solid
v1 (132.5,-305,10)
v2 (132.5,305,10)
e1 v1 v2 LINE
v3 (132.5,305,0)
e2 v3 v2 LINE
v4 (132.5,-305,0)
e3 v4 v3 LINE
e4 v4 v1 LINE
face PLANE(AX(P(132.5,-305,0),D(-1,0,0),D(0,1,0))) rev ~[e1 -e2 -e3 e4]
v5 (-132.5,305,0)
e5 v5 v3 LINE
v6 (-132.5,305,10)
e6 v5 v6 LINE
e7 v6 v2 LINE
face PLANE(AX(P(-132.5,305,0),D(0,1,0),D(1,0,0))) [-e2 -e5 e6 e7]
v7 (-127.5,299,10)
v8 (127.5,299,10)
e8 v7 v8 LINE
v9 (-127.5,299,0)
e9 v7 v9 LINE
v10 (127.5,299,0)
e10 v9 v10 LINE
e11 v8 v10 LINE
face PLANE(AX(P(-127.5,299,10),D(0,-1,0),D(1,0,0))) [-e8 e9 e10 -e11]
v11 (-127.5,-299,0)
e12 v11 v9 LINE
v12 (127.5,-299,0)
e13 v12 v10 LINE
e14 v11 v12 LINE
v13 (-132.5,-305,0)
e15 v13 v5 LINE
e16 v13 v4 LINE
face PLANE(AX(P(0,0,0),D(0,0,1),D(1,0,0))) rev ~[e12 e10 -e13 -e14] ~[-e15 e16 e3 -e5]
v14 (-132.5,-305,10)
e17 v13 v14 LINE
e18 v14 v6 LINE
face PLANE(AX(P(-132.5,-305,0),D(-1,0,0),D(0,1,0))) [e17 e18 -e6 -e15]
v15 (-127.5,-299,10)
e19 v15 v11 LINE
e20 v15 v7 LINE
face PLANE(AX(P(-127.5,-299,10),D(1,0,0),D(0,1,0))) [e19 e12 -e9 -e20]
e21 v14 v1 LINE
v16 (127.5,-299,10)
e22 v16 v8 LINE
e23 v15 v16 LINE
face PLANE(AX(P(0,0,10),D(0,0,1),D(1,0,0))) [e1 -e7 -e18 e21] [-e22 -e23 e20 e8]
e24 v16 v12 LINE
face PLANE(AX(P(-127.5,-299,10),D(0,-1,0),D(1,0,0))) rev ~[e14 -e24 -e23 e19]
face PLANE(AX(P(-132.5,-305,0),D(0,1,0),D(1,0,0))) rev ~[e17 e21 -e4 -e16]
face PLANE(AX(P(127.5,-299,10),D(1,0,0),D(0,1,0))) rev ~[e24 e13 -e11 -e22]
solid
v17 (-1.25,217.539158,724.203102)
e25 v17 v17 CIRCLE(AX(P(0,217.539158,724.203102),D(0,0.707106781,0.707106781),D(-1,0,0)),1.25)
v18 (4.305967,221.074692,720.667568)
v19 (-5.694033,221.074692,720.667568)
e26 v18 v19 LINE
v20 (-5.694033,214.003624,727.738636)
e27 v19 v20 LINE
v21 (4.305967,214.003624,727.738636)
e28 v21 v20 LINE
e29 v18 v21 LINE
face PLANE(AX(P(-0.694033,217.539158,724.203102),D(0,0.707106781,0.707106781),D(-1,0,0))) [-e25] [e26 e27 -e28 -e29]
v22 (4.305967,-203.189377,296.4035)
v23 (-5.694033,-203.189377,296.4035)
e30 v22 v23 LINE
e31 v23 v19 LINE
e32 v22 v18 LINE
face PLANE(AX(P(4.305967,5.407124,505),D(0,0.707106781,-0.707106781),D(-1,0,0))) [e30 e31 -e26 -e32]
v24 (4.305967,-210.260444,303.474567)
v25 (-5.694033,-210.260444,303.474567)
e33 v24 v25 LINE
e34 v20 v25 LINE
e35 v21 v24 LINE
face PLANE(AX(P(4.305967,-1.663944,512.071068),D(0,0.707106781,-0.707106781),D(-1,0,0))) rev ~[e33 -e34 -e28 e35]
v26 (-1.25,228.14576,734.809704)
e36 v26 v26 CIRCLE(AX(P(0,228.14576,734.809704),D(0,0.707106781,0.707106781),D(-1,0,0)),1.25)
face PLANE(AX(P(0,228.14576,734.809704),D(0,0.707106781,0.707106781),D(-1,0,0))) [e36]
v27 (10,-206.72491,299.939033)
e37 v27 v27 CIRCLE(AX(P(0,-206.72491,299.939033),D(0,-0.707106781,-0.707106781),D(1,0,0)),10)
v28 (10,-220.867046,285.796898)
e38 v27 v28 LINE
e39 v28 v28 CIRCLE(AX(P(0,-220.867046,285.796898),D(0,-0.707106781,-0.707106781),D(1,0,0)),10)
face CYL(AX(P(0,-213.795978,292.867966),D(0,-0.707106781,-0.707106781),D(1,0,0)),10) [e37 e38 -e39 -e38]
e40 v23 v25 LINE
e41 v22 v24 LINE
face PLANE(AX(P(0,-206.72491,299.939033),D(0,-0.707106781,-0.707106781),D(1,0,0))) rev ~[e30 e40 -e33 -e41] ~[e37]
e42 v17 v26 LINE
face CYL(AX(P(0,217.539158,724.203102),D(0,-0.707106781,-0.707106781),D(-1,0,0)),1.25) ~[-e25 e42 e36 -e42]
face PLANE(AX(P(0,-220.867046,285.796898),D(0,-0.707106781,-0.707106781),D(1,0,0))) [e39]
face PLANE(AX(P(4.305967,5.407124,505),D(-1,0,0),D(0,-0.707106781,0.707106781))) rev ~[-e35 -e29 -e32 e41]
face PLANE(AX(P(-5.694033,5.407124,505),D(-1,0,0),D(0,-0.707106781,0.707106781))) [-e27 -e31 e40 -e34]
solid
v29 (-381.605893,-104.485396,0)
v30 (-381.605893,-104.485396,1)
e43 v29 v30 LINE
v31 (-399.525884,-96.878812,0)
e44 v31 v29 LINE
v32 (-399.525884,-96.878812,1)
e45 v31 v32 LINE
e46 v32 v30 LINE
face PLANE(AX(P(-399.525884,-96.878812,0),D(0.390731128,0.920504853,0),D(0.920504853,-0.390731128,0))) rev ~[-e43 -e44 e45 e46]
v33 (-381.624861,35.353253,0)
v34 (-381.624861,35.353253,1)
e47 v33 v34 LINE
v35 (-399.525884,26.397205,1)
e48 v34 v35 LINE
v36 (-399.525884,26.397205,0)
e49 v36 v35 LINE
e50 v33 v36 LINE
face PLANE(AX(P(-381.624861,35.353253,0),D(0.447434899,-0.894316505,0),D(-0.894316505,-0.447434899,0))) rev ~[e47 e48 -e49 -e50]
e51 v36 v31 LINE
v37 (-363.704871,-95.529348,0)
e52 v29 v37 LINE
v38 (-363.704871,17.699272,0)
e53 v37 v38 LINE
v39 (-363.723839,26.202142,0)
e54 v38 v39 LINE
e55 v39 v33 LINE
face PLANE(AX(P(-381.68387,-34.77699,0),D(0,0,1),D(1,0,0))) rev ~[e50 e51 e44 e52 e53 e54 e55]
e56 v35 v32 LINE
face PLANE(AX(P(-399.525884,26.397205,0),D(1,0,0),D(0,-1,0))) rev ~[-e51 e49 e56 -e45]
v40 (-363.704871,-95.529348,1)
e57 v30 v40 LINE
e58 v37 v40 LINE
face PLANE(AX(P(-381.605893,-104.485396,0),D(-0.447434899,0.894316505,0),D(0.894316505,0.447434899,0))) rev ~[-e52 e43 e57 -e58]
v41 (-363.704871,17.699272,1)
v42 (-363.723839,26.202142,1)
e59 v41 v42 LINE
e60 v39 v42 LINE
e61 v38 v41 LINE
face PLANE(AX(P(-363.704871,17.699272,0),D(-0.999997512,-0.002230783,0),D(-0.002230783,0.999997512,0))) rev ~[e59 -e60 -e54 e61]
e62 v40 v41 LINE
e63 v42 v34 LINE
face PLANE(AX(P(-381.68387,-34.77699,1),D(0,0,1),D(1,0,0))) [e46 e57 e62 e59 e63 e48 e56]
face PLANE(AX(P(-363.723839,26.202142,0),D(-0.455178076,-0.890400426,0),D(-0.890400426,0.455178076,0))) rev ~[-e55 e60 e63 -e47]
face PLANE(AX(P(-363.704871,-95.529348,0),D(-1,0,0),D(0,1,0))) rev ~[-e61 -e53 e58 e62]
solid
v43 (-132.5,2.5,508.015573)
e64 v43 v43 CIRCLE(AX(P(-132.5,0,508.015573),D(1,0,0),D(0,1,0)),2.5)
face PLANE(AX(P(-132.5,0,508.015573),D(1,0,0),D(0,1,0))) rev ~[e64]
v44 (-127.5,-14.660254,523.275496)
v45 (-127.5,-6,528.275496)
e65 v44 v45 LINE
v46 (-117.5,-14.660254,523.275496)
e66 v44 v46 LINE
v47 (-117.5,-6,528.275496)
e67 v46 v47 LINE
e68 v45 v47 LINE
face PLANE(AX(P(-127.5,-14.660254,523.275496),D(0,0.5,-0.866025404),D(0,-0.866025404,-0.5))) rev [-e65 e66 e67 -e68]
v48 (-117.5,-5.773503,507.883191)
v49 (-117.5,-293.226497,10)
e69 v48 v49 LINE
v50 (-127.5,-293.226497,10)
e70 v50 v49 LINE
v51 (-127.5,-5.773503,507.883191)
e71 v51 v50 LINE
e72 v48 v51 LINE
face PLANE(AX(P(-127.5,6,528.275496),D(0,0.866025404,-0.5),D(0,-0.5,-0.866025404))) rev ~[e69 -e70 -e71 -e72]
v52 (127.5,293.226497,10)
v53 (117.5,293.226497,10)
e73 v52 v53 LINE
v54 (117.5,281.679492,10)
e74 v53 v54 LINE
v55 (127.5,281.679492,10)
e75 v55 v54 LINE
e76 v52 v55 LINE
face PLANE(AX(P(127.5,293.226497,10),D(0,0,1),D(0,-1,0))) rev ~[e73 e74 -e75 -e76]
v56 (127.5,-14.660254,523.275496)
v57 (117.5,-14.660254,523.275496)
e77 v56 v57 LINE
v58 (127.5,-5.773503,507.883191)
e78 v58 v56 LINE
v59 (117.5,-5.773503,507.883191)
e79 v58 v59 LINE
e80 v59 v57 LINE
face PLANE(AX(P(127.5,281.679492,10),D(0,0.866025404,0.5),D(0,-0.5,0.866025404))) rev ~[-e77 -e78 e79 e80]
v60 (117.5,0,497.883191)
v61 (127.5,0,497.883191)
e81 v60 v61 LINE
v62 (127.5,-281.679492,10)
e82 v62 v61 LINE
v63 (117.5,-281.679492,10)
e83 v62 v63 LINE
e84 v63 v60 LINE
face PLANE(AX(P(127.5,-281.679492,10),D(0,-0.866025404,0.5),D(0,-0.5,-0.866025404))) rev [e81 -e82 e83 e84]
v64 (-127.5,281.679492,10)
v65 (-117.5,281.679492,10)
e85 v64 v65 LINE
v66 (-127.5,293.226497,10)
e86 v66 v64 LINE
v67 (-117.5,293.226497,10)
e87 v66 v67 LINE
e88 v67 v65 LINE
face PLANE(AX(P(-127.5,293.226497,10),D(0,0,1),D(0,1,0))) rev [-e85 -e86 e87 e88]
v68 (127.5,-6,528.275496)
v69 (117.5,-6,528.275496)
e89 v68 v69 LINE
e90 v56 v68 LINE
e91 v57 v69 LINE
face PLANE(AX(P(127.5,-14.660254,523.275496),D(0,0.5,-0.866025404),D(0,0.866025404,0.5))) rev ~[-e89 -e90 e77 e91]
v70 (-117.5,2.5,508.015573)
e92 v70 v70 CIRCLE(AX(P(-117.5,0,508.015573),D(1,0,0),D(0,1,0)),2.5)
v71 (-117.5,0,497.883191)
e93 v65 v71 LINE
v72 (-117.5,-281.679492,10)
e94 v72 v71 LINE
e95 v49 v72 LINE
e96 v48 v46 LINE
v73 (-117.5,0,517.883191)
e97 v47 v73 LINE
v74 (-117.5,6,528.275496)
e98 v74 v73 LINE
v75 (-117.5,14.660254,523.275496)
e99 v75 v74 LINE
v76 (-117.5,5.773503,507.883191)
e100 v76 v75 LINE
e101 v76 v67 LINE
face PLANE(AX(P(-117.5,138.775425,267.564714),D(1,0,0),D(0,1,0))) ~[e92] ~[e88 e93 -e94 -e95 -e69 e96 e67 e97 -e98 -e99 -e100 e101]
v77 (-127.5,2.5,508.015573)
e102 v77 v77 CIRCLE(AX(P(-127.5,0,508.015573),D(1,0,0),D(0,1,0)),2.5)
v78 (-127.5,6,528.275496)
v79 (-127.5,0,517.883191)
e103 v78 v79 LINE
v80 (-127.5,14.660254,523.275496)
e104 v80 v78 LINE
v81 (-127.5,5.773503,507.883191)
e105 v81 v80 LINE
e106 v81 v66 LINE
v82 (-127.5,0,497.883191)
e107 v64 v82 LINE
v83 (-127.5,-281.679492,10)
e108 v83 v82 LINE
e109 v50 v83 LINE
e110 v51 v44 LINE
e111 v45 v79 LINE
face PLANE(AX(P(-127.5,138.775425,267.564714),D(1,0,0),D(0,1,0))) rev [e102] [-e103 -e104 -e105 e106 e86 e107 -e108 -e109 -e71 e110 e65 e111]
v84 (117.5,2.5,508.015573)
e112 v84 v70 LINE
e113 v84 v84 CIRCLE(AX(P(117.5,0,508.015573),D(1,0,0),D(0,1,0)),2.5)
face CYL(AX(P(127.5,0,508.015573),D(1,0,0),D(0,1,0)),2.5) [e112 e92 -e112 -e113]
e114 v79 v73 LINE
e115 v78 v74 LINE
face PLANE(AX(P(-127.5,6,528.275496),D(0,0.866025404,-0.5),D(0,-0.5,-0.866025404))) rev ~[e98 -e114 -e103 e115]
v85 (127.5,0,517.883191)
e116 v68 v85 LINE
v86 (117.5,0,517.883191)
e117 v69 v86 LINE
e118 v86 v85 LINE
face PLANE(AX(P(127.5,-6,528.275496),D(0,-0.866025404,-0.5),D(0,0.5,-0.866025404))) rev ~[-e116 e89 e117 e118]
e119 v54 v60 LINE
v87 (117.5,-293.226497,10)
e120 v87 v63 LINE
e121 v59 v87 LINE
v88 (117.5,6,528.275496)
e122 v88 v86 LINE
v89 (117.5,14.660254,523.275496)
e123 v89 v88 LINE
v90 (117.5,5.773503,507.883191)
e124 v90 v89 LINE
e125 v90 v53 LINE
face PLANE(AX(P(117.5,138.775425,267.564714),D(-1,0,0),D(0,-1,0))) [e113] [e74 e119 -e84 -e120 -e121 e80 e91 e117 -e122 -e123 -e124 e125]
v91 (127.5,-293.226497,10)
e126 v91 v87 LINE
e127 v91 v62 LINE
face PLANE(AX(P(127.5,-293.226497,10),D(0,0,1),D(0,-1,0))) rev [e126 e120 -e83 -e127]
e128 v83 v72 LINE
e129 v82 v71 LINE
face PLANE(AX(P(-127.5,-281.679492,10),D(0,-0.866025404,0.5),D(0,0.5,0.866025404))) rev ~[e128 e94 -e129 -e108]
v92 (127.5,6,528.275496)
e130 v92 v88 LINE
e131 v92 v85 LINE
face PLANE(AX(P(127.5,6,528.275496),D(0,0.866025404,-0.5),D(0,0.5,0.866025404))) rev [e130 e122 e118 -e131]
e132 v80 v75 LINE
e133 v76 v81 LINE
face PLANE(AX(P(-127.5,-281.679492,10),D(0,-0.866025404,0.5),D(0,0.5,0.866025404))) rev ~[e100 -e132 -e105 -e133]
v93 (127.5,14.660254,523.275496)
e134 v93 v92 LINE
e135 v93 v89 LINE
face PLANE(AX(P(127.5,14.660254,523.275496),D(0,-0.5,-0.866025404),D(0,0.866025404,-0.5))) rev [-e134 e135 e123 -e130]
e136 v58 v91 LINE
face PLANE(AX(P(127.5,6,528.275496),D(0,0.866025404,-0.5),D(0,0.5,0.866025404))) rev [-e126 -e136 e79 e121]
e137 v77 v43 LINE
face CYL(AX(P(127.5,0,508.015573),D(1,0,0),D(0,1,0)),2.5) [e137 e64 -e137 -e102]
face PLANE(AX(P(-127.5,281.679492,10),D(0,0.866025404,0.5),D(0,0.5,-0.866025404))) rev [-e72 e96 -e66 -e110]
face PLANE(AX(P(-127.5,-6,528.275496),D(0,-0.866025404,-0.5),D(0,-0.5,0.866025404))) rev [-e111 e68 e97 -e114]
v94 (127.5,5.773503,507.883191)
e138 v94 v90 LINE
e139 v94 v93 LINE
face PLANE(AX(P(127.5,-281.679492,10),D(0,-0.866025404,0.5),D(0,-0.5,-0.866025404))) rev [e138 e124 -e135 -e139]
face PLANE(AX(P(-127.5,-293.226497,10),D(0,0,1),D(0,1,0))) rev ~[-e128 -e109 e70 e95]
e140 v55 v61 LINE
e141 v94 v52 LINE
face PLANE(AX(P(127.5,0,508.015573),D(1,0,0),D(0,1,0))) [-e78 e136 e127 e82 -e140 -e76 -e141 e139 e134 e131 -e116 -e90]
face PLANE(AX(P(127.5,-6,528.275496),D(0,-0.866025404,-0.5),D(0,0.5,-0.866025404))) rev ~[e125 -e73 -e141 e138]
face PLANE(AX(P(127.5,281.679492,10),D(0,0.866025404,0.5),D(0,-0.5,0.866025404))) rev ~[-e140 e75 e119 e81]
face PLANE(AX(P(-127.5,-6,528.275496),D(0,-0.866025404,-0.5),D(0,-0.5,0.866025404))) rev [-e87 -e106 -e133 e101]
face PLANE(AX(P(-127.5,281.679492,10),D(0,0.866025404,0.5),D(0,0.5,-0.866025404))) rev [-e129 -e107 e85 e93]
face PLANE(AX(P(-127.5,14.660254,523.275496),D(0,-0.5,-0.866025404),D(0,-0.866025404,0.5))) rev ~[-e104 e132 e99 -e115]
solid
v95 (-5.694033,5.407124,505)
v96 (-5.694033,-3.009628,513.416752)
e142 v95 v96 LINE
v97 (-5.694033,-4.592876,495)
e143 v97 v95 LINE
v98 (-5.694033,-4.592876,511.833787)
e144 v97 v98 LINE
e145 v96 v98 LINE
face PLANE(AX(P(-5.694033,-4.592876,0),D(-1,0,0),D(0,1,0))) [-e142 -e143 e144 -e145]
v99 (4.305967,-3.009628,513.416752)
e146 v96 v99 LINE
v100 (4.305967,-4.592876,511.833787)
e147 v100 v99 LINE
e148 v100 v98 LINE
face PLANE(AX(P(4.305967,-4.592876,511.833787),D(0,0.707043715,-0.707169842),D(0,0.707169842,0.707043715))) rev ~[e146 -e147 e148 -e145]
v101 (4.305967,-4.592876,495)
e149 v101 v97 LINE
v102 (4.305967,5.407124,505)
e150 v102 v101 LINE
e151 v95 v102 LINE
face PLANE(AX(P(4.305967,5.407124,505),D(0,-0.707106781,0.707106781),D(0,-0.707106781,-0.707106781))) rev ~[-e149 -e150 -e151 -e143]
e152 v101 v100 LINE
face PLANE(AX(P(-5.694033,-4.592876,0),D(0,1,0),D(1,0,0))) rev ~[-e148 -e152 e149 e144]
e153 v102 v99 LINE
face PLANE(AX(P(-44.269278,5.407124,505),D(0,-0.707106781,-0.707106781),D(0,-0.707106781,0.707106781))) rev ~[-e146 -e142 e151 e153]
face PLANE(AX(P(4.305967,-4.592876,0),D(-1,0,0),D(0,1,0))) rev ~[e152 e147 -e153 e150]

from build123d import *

# Parameters (mm, degrees)
F0_W         = 265
F0_H         = 610
F1_DEPTH     = 10
F2_W         = 255
F2_H         = 598
F3_DEPTH     = 25
F5_DEPTH     = 10
F8_R         = 2.5
F9_DEPTH     = 260
F10_W        = 10
F10_H        = 10
F11_DEPTH    = 520
F12_T1_DEPTH = 87.150489639
F13_W        = 10
F13_H        = 10
F14_DEPTH    = 305
F15_W        = 10
F15_H        = 478.3019721508
F16_DEPTH    = 25
F18_DEPTH    = 25
F20_DEPTH    = 25
F22_R        = 10
F23_DEPTH    = 10
F21_R        = 1.25
F24_DEPTH    = 15
F26_DEPTH    = 1


# Not quite as in the source:
# - a fillet or chamfer that OpenCascade refuses, or shapes differently, is made with other operations: its cross-section is extruded or revolved along the edge and cut away or added


with BuildPart() as f1:
    # F0 (on Top) → F1 (new body)
    with BuildSketch(Plane.XY):
        Rectangle(F0_W, F0_H)
    extrude(amount=F1_DEPTH)

    # F2 (on face) → F3 (cut)
    with BuildSketch(Plane.XY.offset(10)):
        Rectangle(F2_W, F2_H)
    extrude(amount=-F3_DEPTH, mode=Mode.SUBTRACT)


with BuildPart() as f5:
    # F4 (on face) → F5 (new body)
    with BuildSketch(Plane.YZ.offset(-127.5)):
        Polygon((6, 528.2754963085), (-293.2264973081, 10), (-281.6794919243, 10), (14.6602540378, 523.2754963085), align=None)
    extrude(amount=F5_DEPTH)


with BuildPart() as f6_1:
    # F6: instance of F5
    add(f5.part.mirror(Plane.YZ))


with BuildPart() as f7_1:
    # F7: instance of F5
    add(f5.part.mirror(Plane.XZ))


with BuildPart() as f7_2:
    # F7: instance of F6_1
    add(f6_1.part.mirror(Plane.XZ))


with BuildPart() as f5_1:
    add(f5.part)

    add(f6_1.part)  # F9 merges F6_1

    add(f7_1.part)  # F9 merges F7_1

    add(f7_2.part)  # F9 merges F7_2
    # F8 (on face) → F9 (join)
    with BuildSketch(Plane.YZ.offset(127.5)):
        with Locations((0, 508.0155730247)):
            Circle(F8_R)
    extrude(amount=-F9_DEPTH)


with BuildPart() as f11:
    # F10 (on Top) → F11 (new body)
    with BuildSketch(Plane.XY):
        with Locations((-0.6940327585, 0.4071239119)):
            Rectangle(F10_W, F10_H)
    extrude(amount=F11_DEPTH)

    # F12: chamfer of 15 on 1 edges, made by hand

    # F12_s2 → F12_t1 (cut)
    with BuildSketch(Plane.YZ.offset(-44.269277578)):
        Polygon((5.4071239119, 505), (-9.5928760881, 520), (5.4071239119, 520), align=None)
    extrude(amount=F12_T1_DEPTH, mode=Mode.SUBTRACT)

    # F15 (on face) → F16 (cut)
    with BuildSketch(Plane.YZ.offset(4.3059672415)):
        with Locations((0.4071239119, 239.1509860754)):
            Rectangle(F15_W, F15_H)
    extrude(amount=-F16_DEPTH, mode=Mode.SUBTRACT)

    # F17 (on face) → F18 (cut)
    with BuildSketch(Plane.YZ.offset(4.3059672415)):
        Polygon((5.4071239119, 478.3019721508), (5.4071239119, 505), (-4.5928760881, 495), (-4.5928760881, 478.3019721508), align=None)
    extrude(amount=-F18_DEPTH, mode=Mode.SUBTRACT)

    # F19 (on face) → F20 (cut)
    with BuildSketch(Plane.YZ.offset(4.3059672415)):
        Polygon((3.574793685, 520), (-4.5928760881, 520), (-4.5928760881, 511.8337869644), align=None)
    extrude(amount=-F20_DEPTH, mode=Mode.SUBTRACT)


with BuildPart() as f14:
    # F13 (on face) → F14 (new body, symmetric)
    with BuildSketch(Plane(origin=(0, 255.2035619559, 255.2035619559), x_dir=(-1, 0, 0), z_dir=(0, 0.7071067812, 0.7071067812))):
        with Locations((0.6940327585, 358.2655105144)):
            Rectangle(F13_W, F13_H)
    extrude(amount=F14_DEPTH, both=True)

    # F22 (on face) → F23 (join, symmetric)
    with BuildSketch(Plane(origin=(0, 39.535993694, 39.535993694), x_dir=(1, 0, 0), z_dir=(0, -0.7071067812, -0.7071067812))):
        with Locations((0, 358.2655105144)):
            Circle(F22_R)
    extrude(amount=F23_DEPTH, both=True)

    # F21 (on face) → F24 (join)
    with BuildSketch(Plane(origin=(0, 470.8711302178, 470.8711302178), x_dir=(-1, 0, 0), z_dir=(0, 0.7071067812, 0.7071067812))):
        with Locations((0, 358.2655105144)):
            Circle(F21_R)
    extrude(amount=F24_DEPTH)


with BuildPart() as f26:
    # F25 (on Top) → F26 (new body)
    with BuildSketch(Plane.XY):
        Polygon((-399.5258836659, 26.3972045484), (-399.5258836659, 20.4128491475), (-399.5258836659, -89.8914735812), (-399.5258836659, -96.8788117204), (-381.6058932129, -104.4853963744), (-363.7048708642, -95.5293477292), (-363.7048708642, -90.8532628168), (-363.7048708642, 17.6992724711), (-363.7238389685, 26.2021424537), (-381.6248613172, 35.3532531936), align=None)
    extrude(amount=F26_DEPTH)


solid = Compound([f1.part, f5_1.part, f11.part, f14.part, f26.part])
